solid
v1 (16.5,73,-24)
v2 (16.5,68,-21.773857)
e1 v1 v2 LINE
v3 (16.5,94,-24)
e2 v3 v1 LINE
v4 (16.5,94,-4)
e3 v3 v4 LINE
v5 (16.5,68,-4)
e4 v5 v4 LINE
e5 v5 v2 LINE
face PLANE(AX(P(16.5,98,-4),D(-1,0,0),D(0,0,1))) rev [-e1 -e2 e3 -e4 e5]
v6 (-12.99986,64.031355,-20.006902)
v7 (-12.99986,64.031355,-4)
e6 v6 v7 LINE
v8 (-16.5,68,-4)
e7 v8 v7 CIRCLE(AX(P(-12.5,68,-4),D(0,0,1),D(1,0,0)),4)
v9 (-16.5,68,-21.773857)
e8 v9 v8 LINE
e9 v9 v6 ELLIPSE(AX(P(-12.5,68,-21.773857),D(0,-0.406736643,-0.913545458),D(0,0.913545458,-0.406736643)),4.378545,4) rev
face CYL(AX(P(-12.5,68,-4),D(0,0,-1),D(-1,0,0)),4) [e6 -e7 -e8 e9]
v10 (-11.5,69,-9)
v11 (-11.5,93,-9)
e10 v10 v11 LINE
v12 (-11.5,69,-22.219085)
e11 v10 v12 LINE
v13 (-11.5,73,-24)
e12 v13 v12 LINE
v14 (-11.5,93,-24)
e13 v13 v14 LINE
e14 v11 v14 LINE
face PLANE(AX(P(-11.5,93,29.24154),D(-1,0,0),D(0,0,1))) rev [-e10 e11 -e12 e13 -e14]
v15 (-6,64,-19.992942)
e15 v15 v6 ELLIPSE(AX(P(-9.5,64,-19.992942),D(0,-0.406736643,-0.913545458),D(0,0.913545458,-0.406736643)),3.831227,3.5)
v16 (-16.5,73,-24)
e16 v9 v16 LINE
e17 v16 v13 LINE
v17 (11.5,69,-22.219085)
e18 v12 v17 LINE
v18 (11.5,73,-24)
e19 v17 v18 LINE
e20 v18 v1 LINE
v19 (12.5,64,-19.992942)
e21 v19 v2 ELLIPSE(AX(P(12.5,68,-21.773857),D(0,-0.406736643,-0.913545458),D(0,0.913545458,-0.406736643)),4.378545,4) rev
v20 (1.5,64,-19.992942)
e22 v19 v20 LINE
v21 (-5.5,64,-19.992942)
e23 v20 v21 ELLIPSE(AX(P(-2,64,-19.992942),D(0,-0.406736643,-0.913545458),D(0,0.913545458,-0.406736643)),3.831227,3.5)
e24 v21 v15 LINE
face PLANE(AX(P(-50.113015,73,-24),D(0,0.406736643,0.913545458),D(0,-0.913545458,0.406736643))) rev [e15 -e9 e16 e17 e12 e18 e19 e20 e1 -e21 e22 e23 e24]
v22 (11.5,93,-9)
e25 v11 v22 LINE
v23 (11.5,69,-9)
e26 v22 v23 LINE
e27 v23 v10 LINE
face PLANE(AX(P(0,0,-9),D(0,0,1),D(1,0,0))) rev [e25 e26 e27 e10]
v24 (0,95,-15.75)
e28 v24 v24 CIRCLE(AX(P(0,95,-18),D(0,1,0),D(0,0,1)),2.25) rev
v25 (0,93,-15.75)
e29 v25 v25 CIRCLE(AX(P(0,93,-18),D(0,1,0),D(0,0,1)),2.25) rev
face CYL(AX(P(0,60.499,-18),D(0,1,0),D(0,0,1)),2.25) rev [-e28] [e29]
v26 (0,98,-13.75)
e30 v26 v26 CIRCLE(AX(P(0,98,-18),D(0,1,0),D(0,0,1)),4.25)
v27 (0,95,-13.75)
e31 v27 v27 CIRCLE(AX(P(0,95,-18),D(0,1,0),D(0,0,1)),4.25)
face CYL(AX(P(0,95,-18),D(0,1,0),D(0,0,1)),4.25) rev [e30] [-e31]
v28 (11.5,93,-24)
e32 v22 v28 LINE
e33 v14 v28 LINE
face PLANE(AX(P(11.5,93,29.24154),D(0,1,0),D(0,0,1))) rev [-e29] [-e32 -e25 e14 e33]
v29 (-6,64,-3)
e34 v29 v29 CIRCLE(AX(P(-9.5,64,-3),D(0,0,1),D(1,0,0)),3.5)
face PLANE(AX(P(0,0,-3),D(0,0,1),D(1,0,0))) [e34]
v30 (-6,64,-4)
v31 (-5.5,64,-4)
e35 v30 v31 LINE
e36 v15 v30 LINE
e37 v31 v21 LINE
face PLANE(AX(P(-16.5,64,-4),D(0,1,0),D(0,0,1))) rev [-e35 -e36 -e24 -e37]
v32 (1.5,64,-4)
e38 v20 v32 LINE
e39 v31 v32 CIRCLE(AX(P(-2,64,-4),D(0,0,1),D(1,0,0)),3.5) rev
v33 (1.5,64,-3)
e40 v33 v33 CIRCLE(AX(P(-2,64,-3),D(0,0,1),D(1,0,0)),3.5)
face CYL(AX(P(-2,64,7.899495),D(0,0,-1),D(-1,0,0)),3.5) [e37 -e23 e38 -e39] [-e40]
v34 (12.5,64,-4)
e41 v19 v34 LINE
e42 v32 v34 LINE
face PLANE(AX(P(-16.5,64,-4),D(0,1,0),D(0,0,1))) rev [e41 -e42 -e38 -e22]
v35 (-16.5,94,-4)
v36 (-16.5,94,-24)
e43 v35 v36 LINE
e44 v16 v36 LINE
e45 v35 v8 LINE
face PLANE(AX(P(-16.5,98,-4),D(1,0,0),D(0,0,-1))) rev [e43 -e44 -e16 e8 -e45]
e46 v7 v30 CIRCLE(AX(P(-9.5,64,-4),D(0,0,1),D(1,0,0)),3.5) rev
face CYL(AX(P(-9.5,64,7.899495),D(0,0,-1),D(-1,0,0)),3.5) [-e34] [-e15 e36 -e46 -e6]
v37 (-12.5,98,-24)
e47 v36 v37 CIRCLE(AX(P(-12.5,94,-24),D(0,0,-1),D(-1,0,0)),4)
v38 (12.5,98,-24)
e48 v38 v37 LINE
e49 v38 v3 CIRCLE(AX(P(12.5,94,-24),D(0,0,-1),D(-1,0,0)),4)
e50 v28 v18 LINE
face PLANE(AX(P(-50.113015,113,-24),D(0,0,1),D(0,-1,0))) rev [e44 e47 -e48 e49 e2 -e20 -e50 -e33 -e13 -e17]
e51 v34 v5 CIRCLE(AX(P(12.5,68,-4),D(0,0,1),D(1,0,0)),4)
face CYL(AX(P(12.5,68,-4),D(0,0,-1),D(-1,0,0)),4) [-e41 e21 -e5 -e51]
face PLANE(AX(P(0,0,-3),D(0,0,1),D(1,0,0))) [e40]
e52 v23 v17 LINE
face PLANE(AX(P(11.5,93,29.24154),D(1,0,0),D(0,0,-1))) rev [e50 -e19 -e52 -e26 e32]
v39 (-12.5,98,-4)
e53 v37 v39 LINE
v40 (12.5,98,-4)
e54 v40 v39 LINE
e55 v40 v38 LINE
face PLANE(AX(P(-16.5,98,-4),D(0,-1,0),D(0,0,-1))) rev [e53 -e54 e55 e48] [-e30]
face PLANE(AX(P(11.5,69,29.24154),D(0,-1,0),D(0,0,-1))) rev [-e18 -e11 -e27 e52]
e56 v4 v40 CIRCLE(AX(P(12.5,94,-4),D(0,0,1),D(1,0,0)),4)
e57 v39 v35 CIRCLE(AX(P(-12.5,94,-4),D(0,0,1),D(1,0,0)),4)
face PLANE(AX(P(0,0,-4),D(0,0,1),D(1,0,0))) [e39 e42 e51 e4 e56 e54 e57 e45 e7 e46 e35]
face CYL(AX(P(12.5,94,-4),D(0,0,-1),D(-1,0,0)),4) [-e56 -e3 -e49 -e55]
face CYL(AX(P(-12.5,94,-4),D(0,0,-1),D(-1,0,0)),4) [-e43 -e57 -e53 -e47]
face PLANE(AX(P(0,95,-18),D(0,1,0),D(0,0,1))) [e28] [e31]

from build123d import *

# Parameters (mm, degrees)
SKETCH1_W                 = 4
SKETCH1_H                 = 32
SKETCH2_W                 = 33
SKETCH2_H                 = 34
BOSS_EXTRUDE1_DEPTH       = 20
FILLET1_R                 = 4
SKETCH6_R                 = 3.5
BOSS_EXTRUDE5_DEPTH       = 21
BOSS_EXTRUDE4_DEPTH       = 5
BOSS_EXTRUDE6_DEPTH       = 24
BOSS_EXTRUDE6_DEPTH_BACK  = 29
CHAMFER1_SIZE             = 2.5
CHAMFER1_SIZE2            = 1.443375673
CUT_EXTRUDE1_DEPTH        = 5
SKETCH11_R                = 15
BOSS_EXTRUDE7_DEPTH       = 5
REVOLVE2_ANGLE            = 31
SKETCH14_W                = 100
SKETCH14_H                = 5
CUT_EXTRUDE3_DEPTH        = 71.072541008
CUT_EXTRUDE4_DEPTH        = 128.360121498
FILLET2_R                 = 2
SKETCH16_R                = 14
BOSS_EXTRUDE8_DEPTH       = 1
SKETCH17_W                = 3
SKETCH17_H                = 10
BOSS_EXTRUDE9_DEPTH       = 10
FILLET3_R                 = 5
BOSS_EXTRUDE10_DEPTH      = 11
BOSS_EXTRUDE10_DEPTH_BACK = 11
SKETCH18_R                = 2.5
BOSS_EXTRUDE11_DEPTH      = 7
BOSS_EXTRUDE11_DEPTH_BACK = 7
CUT_EXTRUDE6_DEPTH        = 150.910272613
CUT_EXTRUDE7_DEPTH        = 148.336654753
CUT_EXTRUDE8_START        = -10
CUT_EXTRUDE8_DEPTH        = 10
BOSS_EXTRUDE14_DEPTH      = 11.5
BOSS_EXTRUDE14_DEPTH_BACK = 11.5
SKETCH29_W                = 4
SKETCH29_H                = 5.8
CUT_EXTRUDE9_DEPTH        = 129.091218174
SKETCH30_R                = 1.75
CUT_EXTRUDE10_DEPTH       = 142.472046033
SKETCH31_W                = 39
SKETCH31_H                = 24.998947646
CUT_EXTRUDE11_DEPTH       = 20
CUT_EXTRUDE12_DEPTH       = 29.977320805
CUT_EXTRUDE12_DEPTH_BACK  = 3
SKETCH32_W                = 2.5
SKETCH32_H                = 20
SKETCH33_W                = 8
SKETCH33_H                = 24
CUT_EXTRUDE13_DEPTH       = 3
SKETCH26_R                = 10.5
CUT_EXTRUDE14_DEPTH       = 1
SKETCH34_R                = 0.5
CUT_EXTRUDE15_DEPTH       = 5
CIRPATTERN1_COUNT         = 4
SKETCH35_R                = 3.75
CUT_EXTRUDE16_DEPTH       = 5
CUT_EXTRUDE17_REACH       = 90.337
SKETCH36_W                = 4
SKETCH36_H                = 20
BOSS_EXTRUDE15_DEPTH      = 14
CHAMFER2_SIZE             = 1
CUT_EXTRUDE18_START       = -22.5
CUT_EXTRUDE18_DEPTH       = 7.245247294
CUT_EXTRUDE19_DEPTH       = 137.865224972
CUT_EXTRUDE19_DEPTH_BACK  = 137.865224972
SKETCH40_W                = 5
SKETCH40_H                = 33.621320344
CUT_EXTRUDE20_DEPTH       = 103.304691975
SKETCH41_W                = 23
SKETCH41_H                = 24
CUT_EXTRUDE21_DEPTH       = 15
CUT_EXTRUDE22_REACH       = 49.482
SKETCH42_R                = 2.25
SKETCH43_R                = 4.25
CUT_EXTRUDE23_DEPTH       = 3


# Read off the part's stored shape, not the designer's step: Cut-Extrude18
with BuildPart() as part:
    # Sketch1 → Revolve1 (revolve)
    with BuildSketch(Plane(origin=(0, 0, 0), x_dir=(0, 0, -1), z_dir=(1, 0, 0)), mode=Mode.PRIVATE) as revolve1_sk:
        with Locations((26, 97)):
            Rectangle(SKETCH1_W, SKETCH1_H)
    revolve(revolve1_sk.sketch.rotate(Axis((0, 81, -24), (0, 0, -1)), 90), axis=Axis((0, 81, -24), (0, 0, -1)))

    # Sketch2 → Boss-Extrude1 (add)
    with BuildSketch(Plane.XY.offset(-24)):
        with Locations((0, 81)):
            Rectangle(SKETCH2_W, SKETCH2_H)
    extrude(amount=BOSS_EXTRUDE1_DEPTH)

    # Fillet1
    fillet1_edges = [part.edges().sort_by_distance(p)[0] for p in [
        (-16.5, 98, -14),
        (-16.5, 64, -14),
        (16.5, 64, -14),
        (16.5, 98, -14),
    ]]
    fillet(fillet1_edges, radius=FILLET1_R)

    # Sketch6 → Boss-Extrude5 (add)
    with BuildSketch(Plane.XY.offset(-24)):
        with Locations((-9.5, 64)):
            Circle(SKETCH6_R)
        with Locations((-2, 64)):
            Circle(SKETCH6_R)
    extrude(amount=BOSS_EXTRUDE5_DEPTH)

    # Sketch5 → Boss-Extrude4 (add)
    with BuildSketch(Plane.ZY.offset(16.5)):
        with BuildLine():
            Line((-24, 95.878679656), (-24, 65.878679656))
            Line((-24, 65.878679656), (-24, 64.378679656))
            Line((-24, 64.378679656), (-18, 64.378679656))
            ThreePointArc((-18, 64.378679656), (-13.407206732, 65.949409044), (-10.738156226, 70.003679656))
            ThreePointArc((-10.738156226, 70.003679656), (-9.778946909, 76.271114557), (-10.094291182, 82.603679656))
            ThreePointArc((-10.094291182, 82.603679656), (-10.614769033, 84.232569851), (-11.617642296, 85.617642296))
            Line((-11.617642296, 85.617642296), (-22.939339828, 96.939339828))
            Line((-22.939339828, 96.939339828), (-24, 98))
            Line((-24, 98), (-24, 95.878679656))
        make_face()
    boss_extrude4 = extrude(amount=BOSS_EXTRUDE4_DEPTH)

    # Mirror1: Boss-Extrude4 across plane
    add(boss_extrude4.mirror(Plane(origin=(0, 0, 0), x_dir=(0, 0, 1), z_dir=(1, 0, 0))))

    # Sketch8 → Boss-Extrude6 (add, two sides: drawn at the far end of the back side and taken through both)
    with BuildSketch(Plane(origin=(0, 0, 0), x_dir=(0, 0, -1), z_dir=(1, 0, 0)).offset(-BOSS_EXTRUDE6_DEPTH_BACK)):
        with BuildLine():
            Line((31.001853199, 75.687759622), (24, 73))
            Line((24, 73), (17.208840641, 57.746806342))
            ThreePointArc((17.208840641, 57.746806342), (17.088630828, 53.156178786), (20.249693528, 49.825113738))
            Line((20.249693528, 49.825113738), (51.254059511, 36.021080632))
            Line((51.254059511, 36.021080632), (56.33826755, 47.440398853))
            Line((56.33826755, 47.440398853), (58.041837372, 63.648783017))
            Line((58.041837372, 63.648783017), (31.001853199, 75.687759622))
        make_face()
    extrude(amount=BOSS_EXTRUDE6_DEPTH + BOSS_EXTRUDE6_DEPTH_BACK)

    # Chamfer1
    chamfer1_edges = [part.edges().sort_by_distance(p)[0] for p in [
        (-29, 42.923097185, -35.75187652),
        (-29, 53.156178786, -17.088630828),
        (-29, 65.373403171, -20.60442032),
    ]]
    chamfer1_side = [part.faces().sort_by_distance(p)[0] for p in [
        (-29, 56.351609178, -38.570530073),
    ]]
    chamfer(chamfer1_edges, length=CHAMFER1_SIZE, length2=CHAMFER1_SIZE2, reference=chamfer1_side[0])

    # Sketch10 → Cut-Extrude1 (cut)
    with BuildSketch(Plane(origin=(0, 49.106538634, -21.863639636), x_dir=(1, 0, 0), z_dir=(0, -0.9135454576426004, 0.40673664307580126))):
        Polygon((19, 7.766683961), (-19, 7.766683961), (-19, 1.766683961), (-25, 1.766683961), (-25, -28.171819836), (19, -28.171819836), align=None)
    extrude(amount=-CUT_EXTRUDE1_DEPTH, mode=Mode.SUBTRACT)

    # Sketch11 → Boss-Extrude7 (add)
    with BuildSketch(Plane(origin=(0, 53.674265922, -23.897322851), x_dir=(1, 0, 0), z_dir=(0, -0.9135454576426004, 0.4067366430758013))):
        with Locations(Location((0, -11, 0), (0, 0, 90))):
            Circle(SKETCH11_R)
    extrude(amount=BOSS_EXTRUDE7_DEPTH)

    # Sketch12 → Revolve2 (revolve)
    with BuildSketch(Plane(origin=(0, -17.846986098, -49.476286882), x_dir=(-1, 0, 0), z_dir=(0, -0.10452846326764662, -0.9945218953682741))):
        with BuildLine():
            Line((-47.333333333, 89.657262738), (-50, 86.675838768))
            ThreePointArc((-50, 86.675838768), (0, 67.577538205), (50, 86.675838768))
            Line((50, 86.675838768), (47.333333333, 89.657262738))
            ThreePointArc((47.333333333, 89.657262738), (0, 71.577538205), (-47.333333333, 89.657262738))
        make_face()
    revolve(axis=Axis((0, 118.976887958, -63.857055531), (-1, 0, 0)), revolution_arc=REVOLVE2_ANGLE)

    # Sketch14 → Cut-Extrude3 (cut, through all)
    with BuildSketch(Plane(origin=(0, 74.685811448, -33.252265642), x_dir=(1, 0, 0), z_dir=(0, 0.9135454576425986, -0.40673664307580537))):
        with Locations((0, -2.5)):
            Rectangle(SKETCH14_W, SKETCH14_H)
    extrude(amount=CUT_EXTRUDE3_DEPTH, mode=Mode.SUBTRACT)

    # Sketch15 → Cut-Extrude4 (cut, through all)
    with BuildSketch(Plane(origin=(0, 0, -28), x_dir=(-1, 0, 0), z_dir=(0, 0, -1))):
        with BuildLine():
            Line((-31.513326273, 86.559700282), (-55.043150404, 86.559700282))
            Line((-55.043150404, 86.559700282), (-29.919773925, 69.65067719))
            ThreePointArc((-29.919773925, 69.65067719), (-31.858832613, 77.997536923), (-31.513326273, 86.559700282))
        make_face()
        with BuildLine():
            Line((55.043150404, 86.559700282), (29.919773925, 69.65067719))
            ThreePointArc((29.919773925, 69.65067719), (31.858832613, 77.997536923), (31.513326273, 86.559700282))
            Line((31.513326273, 86.559700282), (55.043150404, 86.559700282))
        make_face()
    extrude(amount=-CUT_EXTRUDE4_DEPTH, mode=Mode.SUBTRACT)

    # Fillet2
    fillet2_edges = [part.edges().sort_by_distance(p)[0] for p in [
        (48.666185859, 78.806391764, -35.086866199),
        (-48.666185859, 78.806391764, -35.086866199),
    ]]
    fillet(fillet2_edges, radius=FILLET2_R)

    # Sketch16 → Boss-Extrude8 (add)
    with BuildSketch(Plane(origin=(0, 49.106538634, -21.863639636), x_dir=(1, 0, 0), z_dir=(0, -0.9135454576426004, 0.4067366430758013))):
        with Locations(Location((0, -11, 0), (0, 0, 270))):
            Circle(SKETCH16_R)
    extrude(amount=BOSS_EXTRUDE8_DEPTH)

    # Sketch17 → Boss-Extrude9 (add)
    with BuildSketch(Plane(origin=(0, 48.192993176, -21.456902993), x_dir=(1, 0, 0), z_dir=(0, -0.9135454576426004, 0.4067366430758013))):
        with Locations((-8.5, -11)):
            Rectangle(SKETCH17_W, SKETCH17_H)
        with Locations((8.5, -11)):
            Rectangle(SKETCH17_W, SKETCH17_H)
    extrude(amount=BOSS_EXTRUDE9_DEPTH)

    # Fillet3
    fillet3_edges = [part.edges().sort_by_distance(p)[0] for p in [
        (8.5, 32.549752311, -32.006263885),
        (8.5, 36.617118741, -22.870809308),
        (-8.5, 32.549752311, -32.006263885),
        (-8.5, 36.617118741, -22.870809308),
    ]]
    fillet(fillet3_edges, radius=FILLET3_R - 0.0001)  # a hair under: the kernel refuses the full size

    # Sketch18 → Boss-Extrude10 (add, two sides: drawn at the far end of the back side and taken through both)
    with BuildSketch(Plane(origin=(0, 0, 0), x_dir=(0, 0, -1), z_dir=(1, 0, 0)).offset(-BOSS_EXTRUDE10_DEPTH_BACK)):
        with Locations((29.472219812, 39.151162814)):
            Circle(SKETCH18_R)
    extrude(amount=BOSS_EXTRUDE10_DEPTH + BOSS_EXTRUDE10_DEPTH_BACK)

    # Sketch19 → Boss-Extrude11 (add, two sides: drawn at the far end of the back side and taken through both)
    with BuildSketch(Plane(origin=(0, 0, 0), x_dir=(0, 0, -1), z_dir=(1, 0, 0)).offset(-BOSS_EXTRUDE11_DEPTH_BACK)):
        Polygon((-9.858637787, 19.29122893), (27.352542755, 42.543355199), (36.583230482, 48.311329057), (40.822584596, 41.526944287), (31.591896869, 35.75897043), (-9.536250046, 10.059251922), align=None)
    extrude(amount=BOSS_EXTRUDE11_DEPTH + BOSS_EXTRUDE11_DEPTH_BACK)

    # Sketch22 → Cut-Extrude6 (cut, through all)
    with BuildSketch(Plane.ZY.offset(29)):
        Polygon((-33.862459198, 76.056328613), (-26.096721215, 58.614195528), (-25.276378018, 67.77859965), (-28, 71.392968097), (-29.918482828, 83.52797246), align=None)
    extrude(amount=CUT_EXTRUDE6_DEPTH, mode=Mode.SUBTRACT)

    # Sketch24 → Cut-Extrude7 (cut, through all)
    with BuildSketch(Plane(origin=(24, 0, 0), x_dir=(0, 0, -1), z_dir=(1, 0, 0))):
        Polygon((33.862459198, 76.056328613), (28.211358934, 63.363749607), (28, 63.363749607), (28, 74.53545614), (31.001853199, 75.687759622), align=None)
    extrude(amount=CUT_EXTRUDE7_DEPTH, mode=Mode.SUBTRACT)

    # Sketch25 → Cut-Extrude8 (cut)
    with BuildSketch(Plane(origin=(0, 0, -28), x_dir=(-1, 0, 0), z_dir=(0, 0, -1)).offset(CUT_EXTRUDE8_START)):
        with BuildLine():
            Line((-32.5084646, 71.392968097), (-38.134327203, 71.392968097))
            add(Edge.make_bspline(
                [(-38.134327203, 71.392968097), (-36.477248939, 70.167781572), (-34.767119143, 69.014339761), (-33.008804526, 67.935816953), (-30.373035757, 66.471137376), (-29.529410915, 66.024103649), (-28.677053697, 65.593954957), (-27.816482516, 65.18091973)],
                knots=[0, 0, 0, 0, 0, 0.507824521, 0.507824521, 0.507824521, 0.743043932, 0.743043932, 0.743043932, 0.743043932, 0.743043932], degree=4))
            ThreePointArc((-27.816482515, 65.180919733), (-28.954507591, 67.375151739), (-29.919773925, 69.65067719))
            Line((-29.919773925, 69.65067719), (-32.5084646, 71.392968097))
        make_face()
    extrude(amount=CUT_EXTRUDE8_DEPTH, mode=Mode.SUBTRACT)

    # Sketch27 → Cut-Revolve1 (revolve, cut)
    with BuildSketch(Plane(origin=(0, 0, 0), x_dir=(0, 0, -1), z_dir=(1, 0, 0))):
        Polygon((28, 64), (68, 53.282032303), (68, 76), (28, 76), align=None)
    revolve(axis=Axis((0, 90, -38), (0, 0, -1)), mode=Mode.SUBTRACT)

    # Sketch28 → Boss-Extrude14 (add, two sides: drawn at the far end of the back side and taken through both)
    with BuildSketch(Plane(origin=(0, 0, 0), x_dir=(0, 0, -1), z_dir=(1, 0, 0)).offset(-BOSS_EXTRUDE14_DEPTH_BACK)):
        Polygon((-9.858637787, 19.29122893), (-5.619283673, 12.506844161), (-14.099764635, 7.207651518), (-18.339118749, 13.992036288), align=None)
    extrude(amount=BOSS_EXTRUDE14_DEPTH + BOSS_EXTRUDE14_DEPTH_BACK)

    # Sketch29 → Cut-Extrude9 (cut, through all)
    with BuildSketch(Plane(origin=(0, 18.304416013, 11.437868571), x_dir=(1, 0, 0), z_dir=(0, 0.8480480961564255, 0.5299192642332059))):
        with Locations((6.5, -3.137805165)):
            Rectangle(SKETCH29_W, SKETCH29_H)
        with Locations((-6.5, -3.137805165)):
            Rectangle(SKETCH29_W, SKETCH29_H)
    extrude(amount=-CUT_EXTRUDE9_DEPTH, mode=Mode.SUBTRACT)

    # Sketch30 → Cut-Extrude10 (cut, through all)
    with BuildSketch(Plane(origin=(11.5, 0, 0), x_dir=(0, 0, -1), z_dir=(1, 0, 0))):
        with Locations((-11.979201211, 13.249440224)):
            Circle(SKETCH30_R)
    extrude(amount=-CUT_EXTRUDE10_DEPTH, mode=Mode.SUBTRACT)

    # Sketch31 → Cut-Extrude11 (cut)
    with BuildSketch(Plane(origin=(0, 74.685811448, -33.252265642), x_dir=(1, 0, 0), z_dir=(0, 0.9135454576425989, -0.40673664307580487))):
        with Locations((-4.5, 10.036090721)):
            Rectangle(SKETCH31_W, SKETCH31_H)
    extrude(amount=-CUT_EXTRUDE11_DEPTH, mode=Mode.SUBTRACT)

    # Sketch32 → Cut-Extrude12 (cut, two sides: drawn at the far end of the back side and taken through both)
    with BuildSketch(Plane(origin=(0, 1.001948174, 2.250412443), x_dir=(-1, 0, 0), z_dir=(0, -0.4067366430758048, -0.9135454576425989)).offset(-CUT_EXTRUDE12_DEPTH_BACK)):
        with Locations((3.25, 71.753798701)):
            Rectangle(SKETCH32_W, SKETCH32_H)
    extrude(amount=CUT_EXTRUDE12_DEPTH + CUT_EXTRUDE12_DEPTH_BACK, mode=Mode.SUBTRACT)

    # Sketch33 → Cut-Extrude13 (cut)
    with BuildSketch(Plane(origin=(0, 56.414902295, -25.117532781), x_dir=(1, 0, 0), z_dir=(0, 0.9135454576425986, -0.4067366430758051))):
        with Locations((-19, 10.233316039)):
            Rectangle(SKETCH33_W, SKETCH33_H)
    extrude(amount=-CUT_EXTRUDE13_DEPTH, mode=Mode.SUBTRACT)

    # Sketch26 → Cut-Extrude14 (cut)
    with BuildSketch(Plane(origin=(0, 0, -28), x_dir=(-1, 0, 0), z_dir=(0, 0, -1))):
        with Locations((0, 81)):
            Circle(SKETCH26_R)
    extrude(amount=-CUT_EXTRUDE14_DEPTH, mode=Mode.SUBTRACT)

    # Sketch34 → Cut-Extrude15 (cut)
    with BuildSketch(Plane(origin=(0, 0, -27), x_dir=(-1, 0, 0), z_dir=(0, 0, -1))):
        with Locations((-3, 88.5)):
            Circle(SKETCH34_R)
        with Locations((0, 88.5)):
            Circle(SKETCH34_R)
        with Locations((3, 88.5)):
            Circle(SKETCH34_R)
    cut_extrude15 = extrude(amount=-CUT_EXTRUDE15_DEPTH, mode=Mode.SUBTRACT)

    # CirPattern1: Cut-Extrude15 ×4 about axis
    cirpattern1_axis = Axis((0, 81, 0), (0, 0, 1))
    for i in range(1, CIRPATTERN1_COUNT):
        add(cut_extrude15.rotate(cirpattern1_axis, i * 360 / CIRPATTERN1_COUNT), mode=Mode.SUBTRACT)

    # Sketch35 → Cut-Extrude16 (cut)
    with BuildSketch(Plane(origin=(0, 0, -27), x_dir=(-1, 0, 0), z_dir=(0, 0, -1))):
        with Locations((0, 81)):
            Circle(SKETCH35_R)
    extrude(amount=-CUT_EXTRUDE16_DEPTH, mode=Mode.SUBTRACT)

    # Sketch36 → Cut-Extrude17 (cut, up to next)
    with BuildSketch(Plane(origin=(0, 53.674265922, -23.897322851), x_dir=(1, 0, 0), z_dir=(0, -0.9135454576426004, 0.4067366430758015)), mode=Mode.PRIVATE) as cut_extrude17_sk1:
        with Locations((17, -11)):
            Rectangle(SKETCH36_W, SKETCH36_H)
    cut_extrude17_tool1 = extrude(cut_extrude17_sk1.sketch, amount=-CUT_EXTRUDE17_REACH, mode=Mode.PRIVATE) & part.part
    add(cut_extrude17_tool1.solids().sort_by_distance((17, 49.200163, -33.946323))[0], mode=Mode.SUBTRACT)

    # Sketch37 → Boss-Extrude15 (add)
    with BuildSketch(Plane(origin=(-7, 0, 0), x_dir=(0, 0, -1), z_dir=(1, 0, 0))):
        with BuildLine():
            Line((26.938175739, 45.752573318), (24.904492523, 41.18484603))
            ThreePointArc((24.904492523, 41.18484603), (24.854997538, 41.069823408), (24.808398466, 40.953597406))
            Line((24.808398466, 40.953597406), (30.179134274, 44.30960561))
            Line((30.179134274, 44.30960561), (26.938175739, 45.752573318))
        make_face()
    extrude(amount=BOSS_EXTRUDE15_DEPTH)

    # Chamfer2
    chamfer2_edges = [part.edges().sort_by_distance(p)[0] for p in [
        (3.275817755, 90.975921914, -28),
    ]]
    chamfer(chamfer2_edges, length=CHAMFER2_SIZE - 0.0001)  # a hair under: the kernel refuses the full size

    # Cut-Extrude18 outline → Cut-Extrude18 (cut)
    with BuildSketch(Plane.YZ.offset(CUT_EXTRUDE18_START)):
        Polygon((68.945486948, -28), (75.687759622, -31.001853199), (74.53545614, -28), align=None)
    extrude(amount=CUT_EXTRUDE18_DEPTH, mode=Mode.SUBTRACT)

    # Sketch39 → Cut-Extrude19 (cut, two sides: drawn at the far end of the back side and taken through both)
    with BuildSketch(Plane(origin=(0, 0, 0), x_dir=(0, 0, -1), z_dir=(1, 0, 0)).offset(-CUT_EXTRUDE19_DEPTH_BACK)):
        Polygon((24, 113), (24, 73), (18.434641434, 60.5), (3, 60.5), (-18.339118749, 13.992036288), (-14.099764635, 7.207651518), (51.254059511, 36.021080632), (56.33826755, 47.440398853), (58.848022777, 71.319124773), (28, 113), align=None)
    extrude(amount=CUT_EXTRUDE19_DEPTH + CUT_EXTRUDE19_DEPTH_BACK, mode=Mode.SUBTRACT)

    # Sketch40 → Cut-Extrude20 (cut, through all)
    with BuildSketch(Plane.XY.offset(-4)):
        with Locations((-19, 81.189339828)):
            Rectangle(SKETCH40_W, SKETCH40_H)
        with Locations((19, 81.189339828)):
            Rectangle(SKETCH40_W, SKETCH40_H)
    extrude(amount=-CUT_EXTRUDE20_DEPTH, mode=Mode.SUBTRACT)

    # Sketch41 → Cut-Extrude21 (cut)
    with BuildSketch(Plane(origin=(0, 0, -24), x_dir=(-1, 0, 0), z_dir=(0, 0, -1))):
        with Locations((0, 81)):
            Rectangle(SKETCH41_W, SKETCH41_H)
    extrude(amount=-CUT_EXTRUDE21_DEPTH, mode=Mode.SUBTRACT)

    # Sketch42 → Cut-Extrude22 (cut, up to next)
    with BuildSketch(Plane(origin=(0, 98, 0), x_dir=(1, 0, 0), z_dir=(0, 1, 0)), mode=Mode.PRIVATE) as cut_extrude22_sk1:
        with Locations(Location((0, 18, 0), (0, 0, 270))):
            Circle(SKETCH42_R)
    cut_extrude22_tool1 = extrude(cut_extrude22_sk1.sketch, amount=-CUT_EXTRUDE22_REACH, mode=Mode.PRIVATE) & part.part
    add(cut_extrude22_tool1.solids().sort_by_distance((0, 98, -18))[0], mode=Mode.SUBTRACT)

    # Sketch43 → Cut-Extrude23 (cut)
    with BuildSketch(Plane(origin=(0, 98, 0), x_dir=(1, 0, 0), z_dir=(0, 1, 0))):
        with Locations(Location((0, 18, 0), (0, 0, 270))):
            Circle(SKETCH43_R)
    extrude(amount=-CUT_EXTRUDE23_DEPTH, mode=Mode.SUBTRACT)


solid = part.part
